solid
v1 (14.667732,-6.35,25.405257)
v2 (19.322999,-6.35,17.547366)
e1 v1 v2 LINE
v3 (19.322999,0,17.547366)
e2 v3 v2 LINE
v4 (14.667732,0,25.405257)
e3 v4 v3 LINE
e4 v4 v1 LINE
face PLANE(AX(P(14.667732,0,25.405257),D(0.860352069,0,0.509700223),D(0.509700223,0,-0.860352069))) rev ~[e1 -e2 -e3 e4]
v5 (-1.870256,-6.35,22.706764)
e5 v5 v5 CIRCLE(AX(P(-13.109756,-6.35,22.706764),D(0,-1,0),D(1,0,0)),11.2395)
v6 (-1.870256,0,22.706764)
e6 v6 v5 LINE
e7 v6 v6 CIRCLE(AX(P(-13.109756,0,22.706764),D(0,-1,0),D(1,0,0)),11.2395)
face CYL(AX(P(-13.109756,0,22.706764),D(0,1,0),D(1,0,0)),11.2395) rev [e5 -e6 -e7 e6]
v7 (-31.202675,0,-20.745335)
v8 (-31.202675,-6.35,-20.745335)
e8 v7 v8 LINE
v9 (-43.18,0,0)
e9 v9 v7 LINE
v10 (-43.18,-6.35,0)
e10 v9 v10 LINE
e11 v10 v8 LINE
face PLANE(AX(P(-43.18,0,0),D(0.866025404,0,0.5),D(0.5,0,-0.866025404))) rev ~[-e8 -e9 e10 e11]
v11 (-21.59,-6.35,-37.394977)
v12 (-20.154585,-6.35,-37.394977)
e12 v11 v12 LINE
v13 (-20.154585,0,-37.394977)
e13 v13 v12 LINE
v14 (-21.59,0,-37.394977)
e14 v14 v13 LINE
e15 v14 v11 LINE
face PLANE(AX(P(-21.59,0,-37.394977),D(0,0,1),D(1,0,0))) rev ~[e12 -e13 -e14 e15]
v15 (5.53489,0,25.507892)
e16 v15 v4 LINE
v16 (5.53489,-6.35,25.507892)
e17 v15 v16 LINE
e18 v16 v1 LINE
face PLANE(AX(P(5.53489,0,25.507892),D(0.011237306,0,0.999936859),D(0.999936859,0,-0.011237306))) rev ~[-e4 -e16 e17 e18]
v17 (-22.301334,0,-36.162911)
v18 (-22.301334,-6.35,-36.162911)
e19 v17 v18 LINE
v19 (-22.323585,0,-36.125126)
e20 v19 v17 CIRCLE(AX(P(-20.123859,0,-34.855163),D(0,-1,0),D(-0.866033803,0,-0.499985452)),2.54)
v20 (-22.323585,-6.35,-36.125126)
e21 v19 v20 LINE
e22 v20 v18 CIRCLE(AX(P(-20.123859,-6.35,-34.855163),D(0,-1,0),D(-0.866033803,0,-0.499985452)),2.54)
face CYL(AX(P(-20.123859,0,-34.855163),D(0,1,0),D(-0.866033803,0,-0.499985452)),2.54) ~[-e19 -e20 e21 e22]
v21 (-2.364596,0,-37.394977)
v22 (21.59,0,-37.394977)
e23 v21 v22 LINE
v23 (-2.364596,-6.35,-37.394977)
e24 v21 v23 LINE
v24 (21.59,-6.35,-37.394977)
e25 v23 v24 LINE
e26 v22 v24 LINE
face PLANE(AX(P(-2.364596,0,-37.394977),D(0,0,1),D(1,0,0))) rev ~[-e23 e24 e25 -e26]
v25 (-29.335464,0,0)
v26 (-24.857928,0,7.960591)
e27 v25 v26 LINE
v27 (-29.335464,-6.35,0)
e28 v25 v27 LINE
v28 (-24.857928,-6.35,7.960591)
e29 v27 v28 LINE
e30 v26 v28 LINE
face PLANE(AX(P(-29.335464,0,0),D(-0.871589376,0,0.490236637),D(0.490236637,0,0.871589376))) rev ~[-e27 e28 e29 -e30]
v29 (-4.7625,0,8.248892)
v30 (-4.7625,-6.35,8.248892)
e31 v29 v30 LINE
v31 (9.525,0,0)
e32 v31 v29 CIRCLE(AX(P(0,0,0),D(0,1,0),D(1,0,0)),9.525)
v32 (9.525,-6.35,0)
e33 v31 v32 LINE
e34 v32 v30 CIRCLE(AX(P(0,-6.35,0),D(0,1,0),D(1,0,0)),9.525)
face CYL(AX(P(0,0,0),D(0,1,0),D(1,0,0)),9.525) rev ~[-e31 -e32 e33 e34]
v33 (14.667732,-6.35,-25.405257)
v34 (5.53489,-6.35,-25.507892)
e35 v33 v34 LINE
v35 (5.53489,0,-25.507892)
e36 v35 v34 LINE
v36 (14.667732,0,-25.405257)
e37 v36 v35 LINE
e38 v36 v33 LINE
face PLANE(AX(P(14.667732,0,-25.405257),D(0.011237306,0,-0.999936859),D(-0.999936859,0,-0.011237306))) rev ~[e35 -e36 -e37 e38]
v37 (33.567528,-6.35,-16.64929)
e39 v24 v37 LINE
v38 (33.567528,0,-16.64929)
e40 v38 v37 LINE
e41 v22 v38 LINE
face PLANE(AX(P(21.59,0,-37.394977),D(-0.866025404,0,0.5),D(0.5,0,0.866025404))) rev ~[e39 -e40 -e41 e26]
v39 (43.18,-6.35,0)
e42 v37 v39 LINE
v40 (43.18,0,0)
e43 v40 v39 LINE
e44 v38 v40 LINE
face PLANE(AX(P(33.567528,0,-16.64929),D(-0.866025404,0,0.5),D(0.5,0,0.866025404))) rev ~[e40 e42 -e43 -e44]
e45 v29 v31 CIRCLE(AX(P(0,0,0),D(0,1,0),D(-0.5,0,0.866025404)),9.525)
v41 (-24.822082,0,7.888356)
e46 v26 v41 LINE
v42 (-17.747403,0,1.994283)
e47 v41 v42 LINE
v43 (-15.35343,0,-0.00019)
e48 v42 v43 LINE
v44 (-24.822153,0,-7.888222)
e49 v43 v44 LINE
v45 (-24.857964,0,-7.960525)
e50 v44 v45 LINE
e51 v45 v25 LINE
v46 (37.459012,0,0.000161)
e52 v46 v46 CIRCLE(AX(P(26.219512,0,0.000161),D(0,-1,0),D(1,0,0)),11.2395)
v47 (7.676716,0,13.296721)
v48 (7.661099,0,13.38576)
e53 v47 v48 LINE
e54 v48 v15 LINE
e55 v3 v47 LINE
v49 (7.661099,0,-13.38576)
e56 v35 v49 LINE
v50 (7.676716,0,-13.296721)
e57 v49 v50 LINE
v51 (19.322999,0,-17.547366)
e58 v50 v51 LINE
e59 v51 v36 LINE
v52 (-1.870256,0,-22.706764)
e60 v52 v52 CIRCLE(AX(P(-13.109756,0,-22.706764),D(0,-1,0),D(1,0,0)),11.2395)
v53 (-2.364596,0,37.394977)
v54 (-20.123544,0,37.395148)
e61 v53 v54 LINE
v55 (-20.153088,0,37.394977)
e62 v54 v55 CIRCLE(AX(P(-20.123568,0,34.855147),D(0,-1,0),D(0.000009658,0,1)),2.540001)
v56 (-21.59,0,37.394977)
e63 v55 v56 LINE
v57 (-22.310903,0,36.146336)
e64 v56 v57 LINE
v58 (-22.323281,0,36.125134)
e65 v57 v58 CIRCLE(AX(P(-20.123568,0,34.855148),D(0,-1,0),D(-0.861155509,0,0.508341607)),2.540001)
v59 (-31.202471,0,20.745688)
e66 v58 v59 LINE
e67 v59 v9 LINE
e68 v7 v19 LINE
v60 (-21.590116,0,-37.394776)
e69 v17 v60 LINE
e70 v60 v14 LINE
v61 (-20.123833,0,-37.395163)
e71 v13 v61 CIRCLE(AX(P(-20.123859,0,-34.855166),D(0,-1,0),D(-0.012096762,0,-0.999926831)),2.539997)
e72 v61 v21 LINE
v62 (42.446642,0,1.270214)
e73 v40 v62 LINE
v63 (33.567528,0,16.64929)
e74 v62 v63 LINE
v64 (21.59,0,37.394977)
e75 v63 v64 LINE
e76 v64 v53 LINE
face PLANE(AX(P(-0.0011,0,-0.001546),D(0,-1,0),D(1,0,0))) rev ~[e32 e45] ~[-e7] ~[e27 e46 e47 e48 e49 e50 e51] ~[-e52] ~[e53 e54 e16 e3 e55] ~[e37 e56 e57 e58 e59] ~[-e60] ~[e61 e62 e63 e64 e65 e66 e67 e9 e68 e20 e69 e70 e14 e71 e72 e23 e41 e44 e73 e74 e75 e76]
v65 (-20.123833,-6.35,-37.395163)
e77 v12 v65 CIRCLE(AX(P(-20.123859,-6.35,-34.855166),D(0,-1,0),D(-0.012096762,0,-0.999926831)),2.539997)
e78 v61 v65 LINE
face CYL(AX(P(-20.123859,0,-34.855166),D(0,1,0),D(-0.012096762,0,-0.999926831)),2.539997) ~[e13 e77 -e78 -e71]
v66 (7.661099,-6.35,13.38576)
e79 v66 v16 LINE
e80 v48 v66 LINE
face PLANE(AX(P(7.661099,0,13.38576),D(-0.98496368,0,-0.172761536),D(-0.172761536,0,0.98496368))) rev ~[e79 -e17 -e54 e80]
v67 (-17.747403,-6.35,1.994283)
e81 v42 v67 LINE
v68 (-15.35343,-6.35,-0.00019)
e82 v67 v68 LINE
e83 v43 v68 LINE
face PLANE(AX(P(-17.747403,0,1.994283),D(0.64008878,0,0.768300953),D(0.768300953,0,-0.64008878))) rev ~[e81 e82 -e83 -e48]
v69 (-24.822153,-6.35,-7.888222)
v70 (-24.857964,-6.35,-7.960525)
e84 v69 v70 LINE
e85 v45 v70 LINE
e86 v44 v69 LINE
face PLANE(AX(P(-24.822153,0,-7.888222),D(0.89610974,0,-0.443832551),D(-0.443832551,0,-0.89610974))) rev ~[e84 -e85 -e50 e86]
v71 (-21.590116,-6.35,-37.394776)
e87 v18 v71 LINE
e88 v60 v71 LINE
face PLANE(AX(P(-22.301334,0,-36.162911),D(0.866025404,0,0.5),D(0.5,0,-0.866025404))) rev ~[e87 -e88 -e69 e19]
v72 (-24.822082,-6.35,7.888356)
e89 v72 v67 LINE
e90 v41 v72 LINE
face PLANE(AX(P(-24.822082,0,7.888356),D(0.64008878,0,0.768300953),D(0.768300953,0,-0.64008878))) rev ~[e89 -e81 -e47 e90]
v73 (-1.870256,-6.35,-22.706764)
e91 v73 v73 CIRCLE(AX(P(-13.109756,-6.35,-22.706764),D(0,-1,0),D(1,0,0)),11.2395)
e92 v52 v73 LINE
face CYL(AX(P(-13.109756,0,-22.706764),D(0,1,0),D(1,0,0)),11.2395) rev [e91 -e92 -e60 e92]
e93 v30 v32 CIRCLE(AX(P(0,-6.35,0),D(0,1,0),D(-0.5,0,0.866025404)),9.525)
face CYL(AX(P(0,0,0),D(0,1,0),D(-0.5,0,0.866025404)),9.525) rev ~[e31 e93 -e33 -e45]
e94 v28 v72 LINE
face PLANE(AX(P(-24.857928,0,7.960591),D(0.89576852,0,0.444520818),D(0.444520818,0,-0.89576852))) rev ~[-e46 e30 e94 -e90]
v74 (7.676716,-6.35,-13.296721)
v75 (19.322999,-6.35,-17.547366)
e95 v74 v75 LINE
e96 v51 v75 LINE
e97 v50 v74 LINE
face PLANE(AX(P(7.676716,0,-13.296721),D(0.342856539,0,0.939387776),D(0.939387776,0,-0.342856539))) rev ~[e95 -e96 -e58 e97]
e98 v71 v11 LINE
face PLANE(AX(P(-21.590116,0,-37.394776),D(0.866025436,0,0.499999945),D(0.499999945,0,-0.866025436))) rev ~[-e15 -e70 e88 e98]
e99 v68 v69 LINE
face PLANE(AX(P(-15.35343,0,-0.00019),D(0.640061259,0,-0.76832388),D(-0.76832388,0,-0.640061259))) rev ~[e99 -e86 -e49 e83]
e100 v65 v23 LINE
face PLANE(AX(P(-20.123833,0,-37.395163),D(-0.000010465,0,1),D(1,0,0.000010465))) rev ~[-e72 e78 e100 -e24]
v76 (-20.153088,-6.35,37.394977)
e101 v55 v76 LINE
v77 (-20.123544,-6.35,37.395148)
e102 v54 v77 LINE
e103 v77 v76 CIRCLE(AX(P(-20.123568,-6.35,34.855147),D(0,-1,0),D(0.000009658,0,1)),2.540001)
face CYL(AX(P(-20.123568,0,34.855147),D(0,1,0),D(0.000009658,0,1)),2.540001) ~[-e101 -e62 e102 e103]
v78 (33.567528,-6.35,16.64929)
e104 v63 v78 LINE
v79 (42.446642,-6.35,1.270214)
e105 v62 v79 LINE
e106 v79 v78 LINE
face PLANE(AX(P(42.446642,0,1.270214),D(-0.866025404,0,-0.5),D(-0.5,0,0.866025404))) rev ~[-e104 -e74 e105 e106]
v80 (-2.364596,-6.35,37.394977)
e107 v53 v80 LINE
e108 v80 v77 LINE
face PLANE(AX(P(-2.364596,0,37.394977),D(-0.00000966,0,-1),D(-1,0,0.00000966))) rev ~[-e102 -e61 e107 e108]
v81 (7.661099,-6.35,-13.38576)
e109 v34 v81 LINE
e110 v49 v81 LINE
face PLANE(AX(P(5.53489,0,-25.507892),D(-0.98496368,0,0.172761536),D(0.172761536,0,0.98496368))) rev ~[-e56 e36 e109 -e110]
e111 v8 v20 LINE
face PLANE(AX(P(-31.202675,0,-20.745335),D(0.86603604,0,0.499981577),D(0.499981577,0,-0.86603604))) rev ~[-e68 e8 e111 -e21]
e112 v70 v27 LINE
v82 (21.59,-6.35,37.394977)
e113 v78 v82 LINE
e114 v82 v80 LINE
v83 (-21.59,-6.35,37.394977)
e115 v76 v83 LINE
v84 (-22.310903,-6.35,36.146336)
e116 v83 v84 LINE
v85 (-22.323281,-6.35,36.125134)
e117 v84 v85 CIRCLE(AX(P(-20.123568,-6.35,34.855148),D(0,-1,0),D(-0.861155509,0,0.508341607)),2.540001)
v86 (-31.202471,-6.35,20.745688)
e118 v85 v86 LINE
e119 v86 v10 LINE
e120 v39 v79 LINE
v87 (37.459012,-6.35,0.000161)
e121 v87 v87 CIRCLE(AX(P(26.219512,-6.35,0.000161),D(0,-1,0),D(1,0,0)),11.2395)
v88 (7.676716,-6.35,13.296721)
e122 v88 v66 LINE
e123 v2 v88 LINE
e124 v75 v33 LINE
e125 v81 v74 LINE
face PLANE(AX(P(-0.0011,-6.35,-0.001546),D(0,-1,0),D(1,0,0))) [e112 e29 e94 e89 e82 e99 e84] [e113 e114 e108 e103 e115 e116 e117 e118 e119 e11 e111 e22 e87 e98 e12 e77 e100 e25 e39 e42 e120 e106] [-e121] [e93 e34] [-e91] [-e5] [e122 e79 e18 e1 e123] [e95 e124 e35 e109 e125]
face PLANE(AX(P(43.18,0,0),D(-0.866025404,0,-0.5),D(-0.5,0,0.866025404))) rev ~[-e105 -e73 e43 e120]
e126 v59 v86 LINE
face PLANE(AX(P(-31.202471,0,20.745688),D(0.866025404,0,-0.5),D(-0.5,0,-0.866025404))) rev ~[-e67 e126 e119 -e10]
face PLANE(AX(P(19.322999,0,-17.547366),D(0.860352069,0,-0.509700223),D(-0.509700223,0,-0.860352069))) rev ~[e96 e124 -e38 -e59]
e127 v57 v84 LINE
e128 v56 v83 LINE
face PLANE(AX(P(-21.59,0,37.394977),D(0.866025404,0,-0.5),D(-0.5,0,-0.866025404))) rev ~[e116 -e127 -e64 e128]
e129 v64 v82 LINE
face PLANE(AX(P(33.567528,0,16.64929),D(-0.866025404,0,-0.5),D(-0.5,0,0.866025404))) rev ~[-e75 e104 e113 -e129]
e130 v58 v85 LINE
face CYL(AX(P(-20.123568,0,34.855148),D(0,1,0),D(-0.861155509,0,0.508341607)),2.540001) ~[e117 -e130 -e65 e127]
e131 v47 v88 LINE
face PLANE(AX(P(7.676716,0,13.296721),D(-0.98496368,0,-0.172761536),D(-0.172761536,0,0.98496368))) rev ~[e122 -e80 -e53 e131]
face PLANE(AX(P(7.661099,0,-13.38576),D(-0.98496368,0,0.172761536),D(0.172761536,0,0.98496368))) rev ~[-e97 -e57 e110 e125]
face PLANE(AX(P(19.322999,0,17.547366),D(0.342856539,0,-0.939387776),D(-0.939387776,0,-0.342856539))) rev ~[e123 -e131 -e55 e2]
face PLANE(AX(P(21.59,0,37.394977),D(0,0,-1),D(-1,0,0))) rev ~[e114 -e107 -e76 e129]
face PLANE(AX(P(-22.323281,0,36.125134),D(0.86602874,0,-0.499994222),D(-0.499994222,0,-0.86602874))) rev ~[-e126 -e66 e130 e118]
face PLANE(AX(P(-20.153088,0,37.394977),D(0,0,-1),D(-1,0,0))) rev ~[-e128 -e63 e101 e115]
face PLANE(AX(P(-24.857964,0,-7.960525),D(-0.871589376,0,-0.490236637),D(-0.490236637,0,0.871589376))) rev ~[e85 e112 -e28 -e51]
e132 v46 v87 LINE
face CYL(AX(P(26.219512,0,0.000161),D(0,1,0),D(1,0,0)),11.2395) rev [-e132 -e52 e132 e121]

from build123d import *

# Parameters (mm, degrees)
F0_R     = 11.2395
F1_DEPTH = 6.35


# Not quite as in the source:
# - ends of sketch curves that miss each other by under 0.0002 mm in the source are joined


with BuildPart() as f1:
    # F0 (on Front) → F1 (new body)
    with BuildSketch(Plane.XZ):
        with BuildLine():
            Line((42.4466417494, 1.2702137502), (33.5675281941, 16.6492895541))
            Line((33.5675281941, 16.6492895541), (21.59, 37.3949769354))
            Line((21.59, 37.3949769354), (-2.3645964913, 37.3949769354))
            Line((-2.3645964913, 37.3949769354), (-20.1530883691, 37.3949769354))
            ThreePointArc((-20.1530883691, 37.3949769354), (-21.3957267903, 37.0536052726), (-22.3109030797, 36.1463361741))
            Line((-22.3109030797, 36.1463361741), (-31.2024712814, 20.7456882897))
            Line((-31.2024712814, 20.7456882897), (-43.18, 0))
            Line((-43.18, 0), (-31.2026751276, -20.7453352178))
            Line((-31.2026751276, -20.7453352178), (-22.3013335195, -36.1629111385))
            ThreePointArc((-22.3013335195, -36.1629111385), (-21.904358157, -36.6666327955), (-21.3938662061, -37.0548632868))
            ThreePointArc((-21.3938662061, -37.0548632868), (-20.7960911396, -37.3045921602), (-20.1545849957, -37.3949769354))
            Line((-20.1545849957, -37.3949769354), (-2.3645964913, -37.3949769354))
            Line((-2.3645964913, -37.3949769354), (21.59, -37.3949769354))
            Line((21.59, -37.3949769354), (33.5675281941, -16.6492895541))
            Line((33.5675281941, -16.6492895541), (42.4465800457, -1.269893127))
            Line((42.4465800457, -1.269893127), (42.4466570355, -1.2697597731))
            ThreePointArc((42.4466570355, -1.2697597731), (42.7869372237, 0.0002290365), (42.4466417494, 1.2702137502))
        make_face()
        with Locations((-13.1097560234, -22.7067635073)):
            Circle(F0_R, mode=Mode.SUBTRACT)
        Polygon((19.322999251, -17.547366104), (14.6677320258, -25.4052571005), (5.5348901331, -25.5078921242), (7.6610986638, -13.3857599047), (7.676716044, -13.2967206855), align=None, mode=Mode.SUBTRACT)
        Polygon((-15.3534299541, -0.0001902285), (-24.8221534826, -7.8882218978), (-24.8579644411, -7.9605251767), (-29.3354640516, 0), (-24.8579276431, 7.9605905996), (-24.8220816566, 7.8883561733), (-17.7474034479, 1.9942828585), align=None, mode=Mode.SUBTRACT)
        with Locations((-13.1097560234, 22.7067635073)):
            Circle(F0_R, mode=Mode.SUBTRACT)
        with BuildLine():
            ThreePointArc((-4.7625, 8.248891971), (4.7625, 8.248891971), (9.525, 0))
            ThreePointArc((9.525, 0), (-4.7625, -8.248891971), (-4.7625, 8.248891971))
        make_face(mode=Mode.SUBTRACT)
        with Locations((26.2195120463, 0.0001612286)):
            Circle(F0_R, mode=Mode.SUBTRACT)
        Polygon((5.5348901331, 25.5078921242), (14.6677320258, 25.4052571005), (19.322999251, 17.547366104), (7.676716044, 13.2967206855), (7.6610986638, 13.3857599047), align=None, mode=Mode.SUBTRACT)
        with BuildLine():
            Line((43.18, 0), (42.4466417494, 1.2702137502))
            ThreePointArc((42.4466417494, 1.2702137502), (42.7869372237, 0.0002290365), (42.4466570355, -1.2697597731))
            Line((42.4466570355, -1.2697597731), (42.4465800457, -1.269893127))
            Line((42.4465800457, -1.269893127), (33.5675281941, -16.6492895541))
            Line((33.5675281941, -16.6492895541), (43.18, 0))
        make_face()
        with BuildLine():
            Line((-20.1530883691, 37.3949769354), (-2.3645964913, 37.3949769354))
            Line((-2.3645964913, 37.3949769354), (-20.1235435545, 37.3951484857))
            ThreePointArc((-20.1235435545, 37.3951484857), (-20.1383162113, 37.3951056691), (-20.1530883691, 37.3949769354))
        make_face()
        with BuildLine():
            ThreePointArc((-22.3109030797, 36.1463361741), (-21.3957267903, 37.0536052726), (-20.1530883691, 37.3949769354))
            Line((-20.1530883691, 37.3949769354), (-21.59, 37.3949769354))
            Line((-21.59, 37.3949769354), (-22.3109030797, 36.1463361741))
        make_face()
        with BuildLine():
            Line((-31.2024712814, 20.7456882897), (-22.3109030797, 36.1463361741))
            ThreePointArc((-22.3109030797, 36.1463361741), (-22.3171177275, 36.1357499036), (-22.3232811402, 36.125133722))
            Line((-22.3232811402, 36.125133722), (-31.2024712814, 20.7456882897))
        make_face()
        with BuildLine():
            Line((-20.1238326592, -37.395162783), (-2.3645964913, -37.3949769354))
            Line((-2.3645964913, -37.3949769354), (-20.1545849957, -37.3949769354))
            ThreePointArc((-20.1545849957, -37.3949769354), (-20.1392091087, -37.3951164012), (-20.1238326592, -37.395162783))
        make_face()
        with BuildLine():
            Line((-21.59, -37.3949769354), (-20.1545849957, -37.3949769354))
            ThreePointArc((-20.1545849957, -37.3949769354), (-20.7960911396, -37.3045921602), (-21.3938662061, -37.0548632868))
            Line((-21.3938662061, -37.0548632868), (-21.590116174, -37.3947757161))
            Line((-21.590116174, -37.3947757161), (-21.59, -37.3949769354))
        make_face()
        with BuildLine():
            Line((-21.590116174, -37.3947757161), (-21.3938662061, -37.0548632868))
            ThreePointArc((-21.3938662061, -37.0548632868), (-21.904358157, -36.6666327955), (-22.3013335195, -36.1629111385))
            Line((-22.3013335195, -36.1629111385), (-21.590116174, -37.3947757161))
        make_face()
        with BuildLine():
            Line((-22.3013335195, -36.1629111385), (-31.2026751276, -20.7453352178))
            Line((-31.2026751276, -20.7453352178), (-22.3235850993, -36.1251258309))
            ThreePointArc((-22.3235850993, -36.1251258309), (-22.3125408514, -36.1440665044), (-22.3013335195, -36.1629111385))
        make_face()
    extrude(amount=F1_DEPTH)


solid = f1.part
